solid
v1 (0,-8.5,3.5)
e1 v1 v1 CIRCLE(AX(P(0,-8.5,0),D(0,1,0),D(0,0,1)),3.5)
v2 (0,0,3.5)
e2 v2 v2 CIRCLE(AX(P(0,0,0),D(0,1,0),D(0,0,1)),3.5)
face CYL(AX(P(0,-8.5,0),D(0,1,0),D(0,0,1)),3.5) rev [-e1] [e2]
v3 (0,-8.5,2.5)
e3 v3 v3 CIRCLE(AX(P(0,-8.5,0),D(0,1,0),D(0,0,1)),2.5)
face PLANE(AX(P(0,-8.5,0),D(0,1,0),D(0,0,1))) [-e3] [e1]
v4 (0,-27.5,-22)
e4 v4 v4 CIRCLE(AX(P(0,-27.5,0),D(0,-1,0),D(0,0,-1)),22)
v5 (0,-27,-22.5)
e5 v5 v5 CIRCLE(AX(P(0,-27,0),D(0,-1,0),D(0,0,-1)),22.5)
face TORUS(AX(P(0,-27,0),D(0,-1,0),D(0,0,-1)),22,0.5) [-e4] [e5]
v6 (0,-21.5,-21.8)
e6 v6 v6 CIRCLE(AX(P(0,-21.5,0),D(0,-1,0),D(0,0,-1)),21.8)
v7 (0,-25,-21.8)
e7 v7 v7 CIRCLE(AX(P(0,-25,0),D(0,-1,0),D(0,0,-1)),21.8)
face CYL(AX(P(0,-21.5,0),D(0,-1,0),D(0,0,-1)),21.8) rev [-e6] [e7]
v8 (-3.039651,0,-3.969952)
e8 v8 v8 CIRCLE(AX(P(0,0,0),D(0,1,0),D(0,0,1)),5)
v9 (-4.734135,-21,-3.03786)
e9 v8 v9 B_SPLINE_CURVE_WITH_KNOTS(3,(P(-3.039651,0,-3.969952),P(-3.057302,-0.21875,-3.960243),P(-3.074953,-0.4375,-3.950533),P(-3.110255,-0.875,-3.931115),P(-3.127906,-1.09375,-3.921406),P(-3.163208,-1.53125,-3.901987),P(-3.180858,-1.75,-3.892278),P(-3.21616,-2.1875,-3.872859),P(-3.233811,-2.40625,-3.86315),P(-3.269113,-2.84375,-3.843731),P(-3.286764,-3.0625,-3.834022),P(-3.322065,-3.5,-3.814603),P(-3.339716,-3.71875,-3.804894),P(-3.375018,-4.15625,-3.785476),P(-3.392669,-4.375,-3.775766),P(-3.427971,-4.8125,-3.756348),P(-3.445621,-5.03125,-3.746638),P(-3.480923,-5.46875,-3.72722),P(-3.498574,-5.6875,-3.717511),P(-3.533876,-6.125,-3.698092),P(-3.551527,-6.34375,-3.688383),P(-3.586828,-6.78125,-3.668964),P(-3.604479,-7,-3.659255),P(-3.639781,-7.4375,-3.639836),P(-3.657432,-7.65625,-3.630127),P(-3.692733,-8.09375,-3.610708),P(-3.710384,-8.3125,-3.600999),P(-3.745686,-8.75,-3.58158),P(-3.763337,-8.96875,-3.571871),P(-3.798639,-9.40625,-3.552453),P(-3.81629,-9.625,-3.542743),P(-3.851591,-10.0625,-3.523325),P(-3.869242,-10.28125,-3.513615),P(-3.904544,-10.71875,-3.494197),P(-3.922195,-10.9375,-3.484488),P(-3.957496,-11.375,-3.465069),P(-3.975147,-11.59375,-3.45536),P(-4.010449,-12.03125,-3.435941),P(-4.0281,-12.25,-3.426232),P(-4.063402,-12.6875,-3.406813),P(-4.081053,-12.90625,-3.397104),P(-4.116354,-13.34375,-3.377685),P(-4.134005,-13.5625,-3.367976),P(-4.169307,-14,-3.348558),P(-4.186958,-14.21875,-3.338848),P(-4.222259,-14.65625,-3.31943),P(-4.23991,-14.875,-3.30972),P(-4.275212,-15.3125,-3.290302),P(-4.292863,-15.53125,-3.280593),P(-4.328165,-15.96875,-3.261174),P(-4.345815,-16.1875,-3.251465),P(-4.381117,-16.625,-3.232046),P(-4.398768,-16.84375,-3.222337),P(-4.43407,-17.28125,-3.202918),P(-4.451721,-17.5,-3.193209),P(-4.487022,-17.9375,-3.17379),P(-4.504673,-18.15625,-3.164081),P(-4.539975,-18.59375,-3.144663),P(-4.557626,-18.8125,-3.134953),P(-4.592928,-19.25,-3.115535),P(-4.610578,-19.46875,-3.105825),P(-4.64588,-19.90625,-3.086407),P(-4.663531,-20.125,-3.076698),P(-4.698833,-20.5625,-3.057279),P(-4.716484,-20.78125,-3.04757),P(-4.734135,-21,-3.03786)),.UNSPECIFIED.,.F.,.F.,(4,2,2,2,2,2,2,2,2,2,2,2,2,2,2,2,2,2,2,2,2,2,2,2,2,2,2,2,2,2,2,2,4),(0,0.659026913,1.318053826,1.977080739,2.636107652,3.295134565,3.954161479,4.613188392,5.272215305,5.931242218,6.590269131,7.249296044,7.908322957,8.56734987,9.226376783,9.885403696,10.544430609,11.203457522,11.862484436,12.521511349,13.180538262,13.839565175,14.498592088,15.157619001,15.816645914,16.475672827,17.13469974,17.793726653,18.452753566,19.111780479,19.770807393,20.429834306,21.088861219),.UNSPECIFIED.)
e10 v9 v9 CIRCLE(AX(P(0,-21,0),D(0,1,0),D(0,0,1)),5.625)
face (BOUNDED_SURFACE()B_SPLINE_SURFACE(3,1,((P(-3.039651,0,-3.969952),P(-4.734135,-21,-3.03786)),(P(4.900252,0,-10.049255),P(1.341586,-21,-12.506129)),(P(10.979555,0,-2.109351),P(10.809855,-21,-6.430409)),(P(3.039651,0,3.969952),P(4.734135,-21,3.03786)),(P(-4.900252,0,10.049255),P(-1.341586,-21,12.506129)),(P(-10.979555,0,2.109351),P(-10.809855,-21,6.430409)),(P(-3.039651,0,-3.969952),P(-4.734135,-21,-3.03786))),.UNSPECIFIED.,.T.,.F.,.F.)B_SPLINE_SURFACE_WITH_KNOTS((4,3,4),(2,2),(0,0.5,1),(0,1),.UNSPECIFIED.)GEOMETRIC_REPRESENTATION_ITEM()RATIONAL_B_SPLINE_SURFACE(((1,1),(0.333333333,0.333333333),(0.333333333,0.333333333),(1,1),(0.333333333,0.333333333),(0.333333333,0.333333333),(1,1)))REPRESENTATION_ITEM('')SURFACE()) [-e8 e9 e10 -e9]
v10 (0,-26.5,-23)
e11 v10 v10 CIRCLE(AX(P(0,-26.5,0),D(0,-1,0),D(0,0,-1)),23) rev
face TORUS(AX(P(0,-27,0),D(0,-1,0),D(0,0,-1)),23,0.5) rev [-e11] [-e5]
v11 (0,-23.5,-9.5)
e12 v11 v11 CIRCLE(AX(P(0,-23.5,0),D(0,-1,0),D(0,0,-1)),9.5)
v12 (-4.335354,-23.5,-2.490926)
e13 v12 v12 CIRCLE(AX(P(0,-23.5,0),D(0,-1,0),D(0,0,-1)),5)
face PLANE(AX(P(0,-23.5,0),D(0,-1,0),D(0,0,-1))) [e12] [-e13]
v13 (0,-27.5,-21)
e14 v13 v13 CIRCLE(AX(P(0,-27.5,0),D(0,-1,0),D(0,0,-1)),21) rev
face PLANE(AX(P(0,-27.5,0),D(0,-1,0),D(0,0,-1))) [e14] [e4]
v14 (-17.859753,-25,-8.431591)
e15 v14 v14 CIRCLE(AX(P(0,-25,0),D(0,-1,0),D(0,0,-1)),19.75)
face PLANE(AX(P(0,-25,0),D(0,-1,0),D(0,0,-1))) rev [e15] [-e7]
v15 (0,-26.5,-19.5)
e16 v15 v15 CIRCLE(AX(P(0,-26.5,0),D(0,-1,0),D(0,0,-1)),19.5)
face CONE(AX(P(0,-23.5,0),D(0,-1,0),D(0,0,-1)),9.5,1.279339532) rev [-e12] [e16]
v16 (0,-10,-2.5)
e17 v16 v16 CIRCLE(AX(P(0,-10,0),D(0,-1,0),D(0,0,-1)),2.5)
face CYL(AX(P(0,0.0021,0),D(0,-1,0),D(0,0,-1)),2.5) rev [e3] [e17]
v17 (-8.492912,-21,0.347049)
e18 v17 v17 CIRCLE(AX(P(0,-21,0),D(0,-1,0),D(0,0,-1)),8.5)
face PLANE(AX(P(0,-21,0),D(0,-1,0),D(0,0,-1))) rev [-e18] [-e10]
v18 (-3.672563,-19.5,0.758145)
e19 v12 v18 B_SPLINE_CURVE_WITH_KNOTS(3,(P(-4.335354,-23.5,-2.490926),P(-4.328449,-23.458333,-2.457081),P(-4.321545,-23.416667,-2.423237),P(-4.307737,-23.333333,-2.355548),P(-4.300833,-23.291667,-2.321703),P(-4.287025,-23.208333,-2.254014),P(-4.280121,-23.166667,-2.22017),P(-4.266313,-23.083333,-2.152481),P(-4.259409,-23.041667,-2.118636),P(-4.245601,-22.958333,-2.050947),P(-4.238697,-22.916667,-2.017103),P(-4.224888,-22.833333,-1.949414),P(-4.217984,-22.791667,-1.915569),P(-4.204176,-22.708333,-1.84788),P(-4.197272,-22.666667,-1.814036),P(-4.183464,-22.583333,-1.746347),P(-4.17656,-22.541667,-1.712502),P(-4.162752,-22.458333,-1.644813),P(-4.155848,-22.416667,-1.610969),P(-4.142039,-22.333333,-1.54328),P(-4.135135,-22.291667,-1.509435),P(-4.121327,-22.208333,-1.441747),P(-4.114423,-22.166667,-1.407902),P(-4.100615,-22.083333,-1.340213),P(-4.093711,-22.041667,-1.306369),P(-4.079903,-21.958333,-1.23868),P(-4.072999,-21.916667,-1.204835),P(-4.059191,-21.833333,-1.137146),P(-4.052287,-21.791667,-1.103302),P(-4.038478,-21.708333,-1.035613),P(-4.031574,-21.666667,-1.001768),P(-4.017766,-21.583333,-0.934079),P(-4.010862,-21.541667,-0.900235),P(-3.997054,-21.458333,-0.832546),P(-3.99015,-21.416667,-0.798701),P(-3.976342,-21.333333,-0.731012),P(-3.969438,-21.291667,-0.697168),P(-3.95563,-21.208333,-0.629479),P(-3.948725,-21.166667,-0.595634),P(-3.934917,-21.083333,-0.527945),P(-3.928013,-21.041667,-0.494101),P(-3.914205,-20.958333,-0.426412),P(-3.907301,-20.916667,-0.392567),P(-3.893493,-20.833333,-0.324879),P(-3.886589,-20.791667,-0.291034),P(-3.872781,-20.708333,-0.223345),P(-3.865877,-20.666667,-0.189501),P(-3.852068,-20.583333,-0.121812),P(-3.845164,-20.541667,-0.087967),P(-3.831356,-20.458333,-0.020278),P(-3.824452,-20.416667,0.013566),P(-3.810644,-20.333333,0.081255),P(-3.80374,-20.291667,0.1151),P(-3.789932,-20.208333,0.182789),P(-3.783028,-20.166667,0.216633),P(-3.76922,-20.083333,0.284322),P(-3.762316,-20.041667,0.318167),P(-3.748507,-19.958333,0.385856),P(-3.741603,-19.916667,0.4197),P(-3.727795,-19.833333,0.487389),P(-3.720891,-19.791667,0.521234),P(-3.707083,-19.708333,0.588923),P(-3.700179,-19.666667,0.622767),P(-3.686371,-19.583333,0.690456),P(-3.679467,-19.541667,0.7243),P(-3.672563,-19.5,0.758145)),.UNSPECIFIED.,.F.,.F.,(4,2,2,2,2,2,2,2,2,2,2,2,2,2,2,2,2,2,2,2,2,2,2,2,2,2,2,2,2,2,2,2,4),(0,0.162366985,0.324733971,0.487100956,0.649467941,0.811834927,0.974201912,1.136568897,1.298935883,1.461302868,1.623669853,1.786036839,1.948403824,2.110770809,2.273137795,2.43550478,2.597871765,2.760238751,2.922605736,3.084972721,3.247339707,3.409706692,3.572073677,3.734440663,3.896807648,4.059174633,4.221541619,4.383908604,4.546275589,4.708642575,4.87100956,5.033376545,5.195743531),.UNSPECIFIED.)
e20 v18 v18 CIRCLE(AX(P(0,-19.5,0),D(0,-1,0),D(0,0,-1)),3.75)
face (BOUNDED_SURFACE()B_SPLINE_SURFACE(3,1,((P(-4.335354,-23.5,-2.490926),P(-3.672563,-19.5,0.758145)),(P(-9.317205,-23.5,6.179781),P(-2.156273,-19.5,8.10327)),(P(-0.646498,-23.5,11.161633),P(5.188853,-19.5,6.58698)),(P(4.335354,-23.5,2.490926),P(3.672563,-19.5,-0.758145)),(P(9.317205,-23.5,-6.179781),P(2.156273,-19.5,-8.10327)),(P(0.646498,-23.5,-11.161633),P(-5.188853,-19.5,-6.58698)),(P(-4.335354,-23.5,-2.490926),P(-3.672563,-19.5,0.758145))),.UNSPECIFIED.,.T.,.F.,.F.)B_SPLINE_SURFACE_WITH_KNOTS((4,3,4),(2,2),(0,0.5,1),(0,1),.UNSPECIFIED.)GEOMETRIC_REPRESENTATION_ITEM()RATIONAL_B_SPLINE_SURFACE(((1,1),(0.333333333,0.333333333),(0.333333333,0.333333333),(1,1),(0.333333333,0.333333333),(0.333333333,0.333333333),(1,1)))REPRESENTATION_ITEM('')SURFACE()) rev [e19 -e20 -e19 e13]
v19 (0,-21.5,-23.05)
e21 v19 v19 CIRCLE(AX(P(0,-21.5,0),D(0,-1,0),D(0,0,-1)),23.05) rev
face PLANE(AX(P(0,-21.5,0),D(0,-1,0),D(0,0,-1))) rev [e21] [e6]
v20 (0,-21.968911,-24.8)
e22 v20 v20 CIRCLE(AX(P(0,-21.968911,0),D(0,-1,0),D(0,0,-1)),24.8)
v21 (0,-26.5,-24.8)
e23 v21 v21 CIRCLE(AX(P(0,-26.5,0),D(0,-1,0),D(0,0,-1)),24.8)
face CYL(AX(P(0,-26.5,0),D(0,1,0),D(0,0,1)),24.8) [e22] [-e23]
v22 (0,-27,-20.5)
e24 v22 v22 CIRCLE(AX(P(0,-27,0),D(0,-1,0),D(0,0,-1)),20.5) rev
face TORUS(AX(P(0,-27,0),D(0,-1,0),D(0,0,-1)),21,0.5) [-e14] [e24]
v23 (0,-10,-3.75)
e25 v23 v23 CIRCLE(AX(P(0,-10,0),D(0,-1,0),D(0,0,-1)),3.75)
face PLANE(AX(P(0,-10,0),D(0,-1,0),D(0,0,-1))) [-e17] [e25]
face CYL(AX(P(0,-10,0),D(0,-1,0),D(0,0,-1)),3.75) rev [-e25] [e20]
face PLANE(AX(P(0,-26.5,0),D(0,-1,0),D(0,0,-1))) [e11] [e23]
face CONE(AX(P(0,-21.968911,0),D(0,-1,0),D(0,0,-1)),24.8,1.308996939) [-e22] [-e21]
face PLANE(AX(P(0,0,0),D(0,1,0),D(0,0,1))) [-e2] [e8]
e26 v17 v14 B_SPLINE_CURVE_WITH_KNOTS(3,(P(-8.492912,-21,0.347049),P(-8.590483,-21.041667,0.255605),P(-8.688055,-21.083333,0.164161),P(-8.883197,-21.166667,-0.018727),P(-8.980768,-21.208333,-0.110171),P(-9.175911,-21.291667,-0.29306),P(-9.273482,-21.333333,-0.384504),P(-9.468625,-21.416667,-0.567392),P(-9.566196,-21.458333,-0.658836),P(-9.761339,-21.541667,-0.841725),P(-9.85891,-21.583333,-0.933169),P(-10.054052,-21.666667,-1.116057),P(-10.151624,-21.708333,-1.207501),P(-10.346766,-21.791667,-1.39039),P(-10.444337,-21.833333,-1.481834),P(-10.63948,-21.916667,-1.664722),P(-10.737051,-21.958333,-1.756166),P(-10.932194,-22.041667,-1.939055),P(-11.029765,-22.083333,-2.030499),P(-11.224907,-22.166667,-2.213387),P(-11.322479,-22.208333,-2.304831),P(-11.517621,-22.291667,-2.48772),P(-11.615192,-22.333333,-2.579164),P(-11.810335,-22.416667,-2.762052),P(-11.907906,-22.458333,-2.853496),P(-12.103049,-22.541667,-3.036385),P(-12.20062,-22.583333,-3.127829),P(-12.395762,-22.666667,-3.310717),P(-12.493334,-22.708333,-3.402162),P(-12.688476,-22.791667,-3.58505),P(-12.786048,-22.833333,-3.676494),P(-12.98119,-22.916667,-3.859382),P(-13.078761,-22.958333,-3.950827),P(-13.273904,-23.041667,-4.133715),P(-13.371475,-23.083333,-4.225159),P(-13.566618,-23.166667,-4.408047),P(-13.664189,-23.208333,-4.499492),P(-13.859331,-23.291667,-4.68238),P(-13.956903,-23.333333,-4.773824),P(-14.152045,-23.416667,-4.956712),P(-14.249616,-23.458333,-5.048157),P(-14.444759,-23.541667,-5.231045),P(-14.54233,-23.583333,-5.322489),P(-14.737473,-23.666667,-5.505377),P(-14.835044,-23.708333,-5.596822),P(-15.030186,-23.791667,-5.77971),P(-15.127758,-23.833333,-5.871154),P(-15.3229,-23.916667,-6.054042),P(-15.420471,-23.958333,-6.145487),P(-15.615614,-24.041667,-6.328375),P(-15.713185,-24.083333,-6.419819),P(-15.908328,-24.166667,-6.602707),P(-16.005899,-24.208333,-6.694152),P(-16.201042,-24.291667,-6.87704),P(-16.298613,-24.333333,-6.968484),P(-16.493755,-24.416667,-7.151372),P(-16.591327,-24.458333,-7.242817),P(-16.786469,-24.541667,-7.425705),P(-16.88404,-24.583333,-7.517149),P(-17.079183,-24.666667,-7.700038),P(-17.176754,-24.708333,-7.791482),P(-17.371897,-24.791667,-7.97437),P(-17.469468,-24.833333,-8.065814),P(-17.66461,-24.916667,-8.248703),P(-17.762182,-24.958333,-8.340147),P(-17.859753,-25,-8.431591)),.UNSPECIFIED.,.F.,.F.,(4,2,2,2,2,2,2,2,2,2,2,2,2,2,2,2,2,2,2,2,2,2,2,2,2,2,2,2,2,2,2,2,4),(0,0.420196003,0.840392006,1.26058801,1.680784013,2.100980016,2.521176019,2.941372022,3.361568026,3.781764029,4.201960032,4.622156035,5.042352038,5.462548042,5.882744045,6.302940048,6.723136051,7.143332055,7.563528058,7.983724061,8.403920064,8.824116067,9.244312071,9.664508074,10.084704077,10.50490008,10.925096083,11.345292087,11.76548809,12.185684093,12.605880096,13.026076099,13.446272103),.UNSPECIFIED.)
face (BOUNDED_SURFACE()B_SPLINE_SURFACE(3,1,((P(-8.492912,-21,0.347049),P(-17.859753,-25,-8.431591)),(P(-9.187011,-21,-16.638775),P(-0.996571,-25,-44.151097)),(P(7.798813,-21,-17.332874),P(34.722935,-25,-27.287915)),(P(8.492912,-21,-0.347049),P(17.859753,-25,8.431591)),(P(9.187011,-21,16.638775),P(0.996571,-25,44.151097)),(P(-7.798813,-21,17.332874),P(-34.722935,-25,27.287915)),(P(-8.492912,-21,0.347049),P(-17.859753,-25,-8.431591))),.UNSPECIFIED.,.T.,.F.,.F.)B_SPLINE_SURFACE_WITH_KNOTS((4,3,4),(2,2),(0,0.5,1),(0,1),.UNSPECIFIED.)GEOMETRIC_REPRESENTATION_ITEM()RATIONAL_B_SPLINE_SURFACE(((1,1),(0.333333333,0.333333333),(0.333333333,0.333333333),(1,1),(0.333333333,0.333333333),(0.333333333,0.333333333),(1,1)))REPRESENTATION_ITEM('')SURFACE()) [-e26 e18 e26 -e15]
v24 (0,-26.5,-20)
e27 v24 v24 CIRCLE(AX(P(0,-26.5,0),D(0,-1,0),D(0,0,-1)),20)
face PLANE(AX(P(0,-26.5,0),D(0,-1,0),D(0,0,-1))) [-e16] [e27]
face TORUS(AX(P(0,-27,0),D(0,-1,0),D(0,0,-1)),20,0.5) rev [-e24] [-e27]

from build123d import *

# Parameters (mm, degrees)
SKETCH3_R           = 3.5
CUT_EXTRUDE1_DEPTH  = 8.5
SKETCH6_R           = 24.8
SKETCH6_R_2         = 21.8
BOSS_EXTRUDE1_DEPTH = 3.5
CHAMFER1_SIZE       = 1.75
CHAMFER1_SIZE2      = 0.468911087
SKETCH7_R           = 24.8
BOSS_EXTRUDE2_DEPTH = 1.5
SKETCH8_R           = 22.5
SKETCH8_R_2         = 20.5
BOSS_EXTRUDE3_DEPTH = 1
SKETCH10_R          = 9.5
SKETCH9_R           = 19.5
FILLET1_R           = 0.5
SKETCH13_R          = 3.75
CUT_EXTRUDE2_DEPTH  = 13.5
SKETCH14_R          = 2.5
CUT_EXTRUDE4_DEPTH  = 40.196045764


with BuildPart() as part:
    # Loft1: read off the stored shape, not the designer's step
    # Loft1: loft between two sections, ruled curve by curve
    loft1_from = [
        Edge.make_bspline([(-3.039651488, 0, -3.969951993), (4.900252498, 0, -10.04925497), (10.979555475, 0, -2.109350984), (3.039651488, 0, 3.969951993), (-4.900252498, 0, 10.04925497), (-10.979555475, 0, 2.109350984), (-3.039651488, 0, -3.969951993)], [0, 0, 0, 0, 0.5, 0.5, 0.5, 1, 1, 1, 1], 3, [1, 0.333333333, 0.333333333, 1, 0.333333333, 0.333333333, 1]),
    ]
    loft1_to = [
        Edge.make_bspline([(-4.7341345, -21, -3.037860355), (1.341586209, -21, -12.506129355), (10.809855209, -21, -6.430408646), (4.7341345, -21, 3.037860355), (-1.341586209, -21, 12.506129355), (-10.809855209, -21, 6.430408646), (-4.7341345, -21, -3.037860355)], [0, 0, 0, 0, 0.5, 0.5, 0.5, 1, 1, 1, 1], 3, [1, 0.333333333, 0.333333333, 1, 0.333333333, 0.333333333, 1]),
    ]
    loft1 = Solid(Shell([*[Face.make_surface_from_curves(loft1_from[k], loft1_to[k]) for k in range(1)], Face(Wire(loft1_from)), Face(Wire(loft1_to))]))
    add(loft1)

    # Sketch3 → Cut-Extrude1 (cut)
    with BuildSketch(Plane(origin=(0, 0, 0), x_dir=(1, 0, 0), z_dir=(0, 1, 0))):
        with Locations(Location((0, 0, 0), (0, 0, 270))):
            Circle(SKETCH3_R)
    extrude(amount=-CUT_EXTRUDE1_DEPTH, mode=Mode.SUBTRACT)

    # Loft2: read off the stored shape, not the designer's step
    # Loft2: loft between two sections, ruled curve by curve
    loft2_from = [
        Edge.make_bspline([(-8.492912142, -21, 0.347049492), (-9.187011126, -21, -16.638774792), (7.798813158, -21, -17.332873776), (8.492912142, -21, -0.347049492), (9.187011126, -21, 16.638774792), (-7.798813158, -21, 17.332873776), (-8.492912142, -21, 0.347049492)], [0, 0, 0, 0, 0.5, 0.5, 0.5, 1, 1, 1, 1], 3, [1, 0.333333333, 0.333333333, 1, 0.333333333, 0.333333333, 1]),
    ]
    loft2_to = [
        Edge.make_bspline([(-17.859752941, -25, -8.431590887), (-0.996571166, -25, -44.151096769), (34.722934715, -25, -27.287914995), (17.859752941, -25, 8.431590887), (0.996571166, -25, 44.151096769), (-34.722934715, -25, 27.287914995), (-17.859752941, -25, -8.431590887)], [0, 0, 0, 0, 0.5, 0.5, 0.5, 1, 1, 1, 1], 3, [1, 0.333333333, 0.333333333, 1, 0.333333333, 0.333333333, 1]),
    ]
    loft2 = Solid(Shell([*[Face.make_surface_from_curves(loft2_from[k], loft2_to[k]) for k in range(1)], Face(Wire(loft2_from)), Face(Wire(loft2_to))]))
    add(loft2)



with BuildPart() as body_2:
    # Sketch6 → Boss-Extrude1 (new body)
    with BuildSketch(Plane.XZ.offset(25)):
        with Locations(Location((0, 0, 0), (0, 0, 270))):
            Circle(SKETCH6_R)
        with Locations(Location((0, 0, 0), (0, 0, 270))):
            Circle(SKETCH6_R_2, mode=Mode.SUBTRACT)
    extrude(amount=-BOSS_EXTRUDE1_DEPTH)

    # Chamfer1
    chamfer1_edges = [body_2.edges().sort_by_distance(p)[0] for p in [
        (0, -21.5, 24.8),
    ]]
    chamfer1_side = [body_2.faces().sort_by_distance(p)[0] for p in [
        (0, -21.5, 24.098550073),
    ]]
    chamfer(chamfer1_edges, length=CHAMFER1_SIZE, length2=CHAMFER1_SIZE2, reference=chamfer1_side[0])


with BuildPart() as part_1:
    add(part.part)

    add(body_2.part)  # Boss-Extrude2 merges body 2
    # Sketch7 → Boss-Extrude2 (add)
    with BuildSketch(Plane.XZ.offset(25)):
        with Locations(Location((0, 0, 0), (0, 0, 270))):
            Circle(SKETCH7_R)
    extrude(amount=BOSS_EXTRUDE2_DEPTH)

    # Sketch8 → Boss-Extrude3 (add)
    with BuildSketch(Plane.XZ.offset(26.5)):
        with Locations(Location((0, 0, 0), (0, 0, 270))):
            Circle(SKETCH8_R)
        with Locations(Location((0, 0, 0), (0, 0, 270))):
            Circle(SKETCH8_R_2, mode=Mode.SUBTRACT)
    extrude(amount=BOSS_EXTRUDE3_DEPTH)

    # Sketch10 → Cut-Loft1 section 0
    with BuildSketch(Plane(origin=(0, -23.5, 0), x_dir=(-1, 0, 0), z_dir=(0, -1, 0))):
        Circle(SKETCH10_R)
    # Sketch9 → Cut-Loft1 section 1
    with BuildSketch(Plane.XZ.offset(26.5)):
        Circle(SKETCH9_R)
    loft(mode=Mode.SUBTRACT)

    # Fillet1
    fillet1_edges = [part_1.edges().sort_by_distance(p)[0] for p in [
        (0, -26.5, 20.5),
        (0, -27.5, 22.5),
        (0, -26.5, 22.5),
        (0, -27.5, 20.5),
    ]]
    fillet(fillet1_edges, radius=FILLET1_R - 0.0001)  # a hair under: the kernel refuses the full size

    # Cut-Loft2: read off the stored shape, not the designer's step
    # Cut-Loft2: loft between two sections, ruled curve by curve
    cut_loft2_from = [
        Edge.make_bspline([(-4.335353506, -23.5, -2.490925527), (-9.317204559, -23.5, 6.179781485), (-0.646497548, -23.5, 11.161632538), (4.335353506, -23.5, 2.490925527), (9.317204559, -23.5, -6.179781485), (0.646497548, -23.5, -11.161632538), (-4.335353506, -23.5, -2.490925527)], [0, 0, 0, 0, 0.5, 0.5, 0.5, 1, 1, 1, 1], 3, [1, 0.333333333, 0.333333333, 1, 0.333333333, 0.333333333, 1]),
    ]
    cut_loft2_to = [
        Edge.make_bspline([(-3.672562621, -19.5, 0.758144968), (-2.156272685, -19.5, 8.103270211), (5.188852558, -19.5, 6.586980274), (3.672562621, -19.5, -0.758144968), (2.156272685, -19.5, -8.103270211), (-5.188852558, -19.5, -6.586980274), (-3.672562621, -19.5, 0.758144968)], [0, 0, 0, 0, 0.5, 0.5, 0.5, 1, 1, 1, 1], 3, [1, 0.333333333, 0.333333333, 1, 0.333333333, 0.333333333, 1]),
    ]
    cut_loft2 = Solid(Shell([*[Face.make_surface_from_curves(cut_loft2_from[k], cut_loft2_to[k]) for k in range(1)], Face(Wire(cut_loft2_from)), Face(Wire(cut_loft2_to))]))
    add(cut_loft2, mode=Mode.SUBTRACT)

    # Sketch13 → Cut-Extrude2 (cut)
    with BuildSketch(Plane.XZ.offset(23.5)):
        with Locations(Location((0, 0, 0), (0, 0, 270))):
            Circle(SKETCH13_R)
    extrude(amount=-CUT_EXTRUDE2_DEPTH, mode=Mode.SUBTRACT)

    # Sketch14 → Cut-Extrude4 (cut, through all)
    with BuildSketch(Plane.XZ.offset(10)):
        with Locations(Location((0, 0, 0), (0, 0, 270))):
            Circle(SKETCH14_R)
    extrude(amount=-CUT_EXTRUDE4_DEPTH, mode=Mode.SUBTRACT)


solid = part_1.part
